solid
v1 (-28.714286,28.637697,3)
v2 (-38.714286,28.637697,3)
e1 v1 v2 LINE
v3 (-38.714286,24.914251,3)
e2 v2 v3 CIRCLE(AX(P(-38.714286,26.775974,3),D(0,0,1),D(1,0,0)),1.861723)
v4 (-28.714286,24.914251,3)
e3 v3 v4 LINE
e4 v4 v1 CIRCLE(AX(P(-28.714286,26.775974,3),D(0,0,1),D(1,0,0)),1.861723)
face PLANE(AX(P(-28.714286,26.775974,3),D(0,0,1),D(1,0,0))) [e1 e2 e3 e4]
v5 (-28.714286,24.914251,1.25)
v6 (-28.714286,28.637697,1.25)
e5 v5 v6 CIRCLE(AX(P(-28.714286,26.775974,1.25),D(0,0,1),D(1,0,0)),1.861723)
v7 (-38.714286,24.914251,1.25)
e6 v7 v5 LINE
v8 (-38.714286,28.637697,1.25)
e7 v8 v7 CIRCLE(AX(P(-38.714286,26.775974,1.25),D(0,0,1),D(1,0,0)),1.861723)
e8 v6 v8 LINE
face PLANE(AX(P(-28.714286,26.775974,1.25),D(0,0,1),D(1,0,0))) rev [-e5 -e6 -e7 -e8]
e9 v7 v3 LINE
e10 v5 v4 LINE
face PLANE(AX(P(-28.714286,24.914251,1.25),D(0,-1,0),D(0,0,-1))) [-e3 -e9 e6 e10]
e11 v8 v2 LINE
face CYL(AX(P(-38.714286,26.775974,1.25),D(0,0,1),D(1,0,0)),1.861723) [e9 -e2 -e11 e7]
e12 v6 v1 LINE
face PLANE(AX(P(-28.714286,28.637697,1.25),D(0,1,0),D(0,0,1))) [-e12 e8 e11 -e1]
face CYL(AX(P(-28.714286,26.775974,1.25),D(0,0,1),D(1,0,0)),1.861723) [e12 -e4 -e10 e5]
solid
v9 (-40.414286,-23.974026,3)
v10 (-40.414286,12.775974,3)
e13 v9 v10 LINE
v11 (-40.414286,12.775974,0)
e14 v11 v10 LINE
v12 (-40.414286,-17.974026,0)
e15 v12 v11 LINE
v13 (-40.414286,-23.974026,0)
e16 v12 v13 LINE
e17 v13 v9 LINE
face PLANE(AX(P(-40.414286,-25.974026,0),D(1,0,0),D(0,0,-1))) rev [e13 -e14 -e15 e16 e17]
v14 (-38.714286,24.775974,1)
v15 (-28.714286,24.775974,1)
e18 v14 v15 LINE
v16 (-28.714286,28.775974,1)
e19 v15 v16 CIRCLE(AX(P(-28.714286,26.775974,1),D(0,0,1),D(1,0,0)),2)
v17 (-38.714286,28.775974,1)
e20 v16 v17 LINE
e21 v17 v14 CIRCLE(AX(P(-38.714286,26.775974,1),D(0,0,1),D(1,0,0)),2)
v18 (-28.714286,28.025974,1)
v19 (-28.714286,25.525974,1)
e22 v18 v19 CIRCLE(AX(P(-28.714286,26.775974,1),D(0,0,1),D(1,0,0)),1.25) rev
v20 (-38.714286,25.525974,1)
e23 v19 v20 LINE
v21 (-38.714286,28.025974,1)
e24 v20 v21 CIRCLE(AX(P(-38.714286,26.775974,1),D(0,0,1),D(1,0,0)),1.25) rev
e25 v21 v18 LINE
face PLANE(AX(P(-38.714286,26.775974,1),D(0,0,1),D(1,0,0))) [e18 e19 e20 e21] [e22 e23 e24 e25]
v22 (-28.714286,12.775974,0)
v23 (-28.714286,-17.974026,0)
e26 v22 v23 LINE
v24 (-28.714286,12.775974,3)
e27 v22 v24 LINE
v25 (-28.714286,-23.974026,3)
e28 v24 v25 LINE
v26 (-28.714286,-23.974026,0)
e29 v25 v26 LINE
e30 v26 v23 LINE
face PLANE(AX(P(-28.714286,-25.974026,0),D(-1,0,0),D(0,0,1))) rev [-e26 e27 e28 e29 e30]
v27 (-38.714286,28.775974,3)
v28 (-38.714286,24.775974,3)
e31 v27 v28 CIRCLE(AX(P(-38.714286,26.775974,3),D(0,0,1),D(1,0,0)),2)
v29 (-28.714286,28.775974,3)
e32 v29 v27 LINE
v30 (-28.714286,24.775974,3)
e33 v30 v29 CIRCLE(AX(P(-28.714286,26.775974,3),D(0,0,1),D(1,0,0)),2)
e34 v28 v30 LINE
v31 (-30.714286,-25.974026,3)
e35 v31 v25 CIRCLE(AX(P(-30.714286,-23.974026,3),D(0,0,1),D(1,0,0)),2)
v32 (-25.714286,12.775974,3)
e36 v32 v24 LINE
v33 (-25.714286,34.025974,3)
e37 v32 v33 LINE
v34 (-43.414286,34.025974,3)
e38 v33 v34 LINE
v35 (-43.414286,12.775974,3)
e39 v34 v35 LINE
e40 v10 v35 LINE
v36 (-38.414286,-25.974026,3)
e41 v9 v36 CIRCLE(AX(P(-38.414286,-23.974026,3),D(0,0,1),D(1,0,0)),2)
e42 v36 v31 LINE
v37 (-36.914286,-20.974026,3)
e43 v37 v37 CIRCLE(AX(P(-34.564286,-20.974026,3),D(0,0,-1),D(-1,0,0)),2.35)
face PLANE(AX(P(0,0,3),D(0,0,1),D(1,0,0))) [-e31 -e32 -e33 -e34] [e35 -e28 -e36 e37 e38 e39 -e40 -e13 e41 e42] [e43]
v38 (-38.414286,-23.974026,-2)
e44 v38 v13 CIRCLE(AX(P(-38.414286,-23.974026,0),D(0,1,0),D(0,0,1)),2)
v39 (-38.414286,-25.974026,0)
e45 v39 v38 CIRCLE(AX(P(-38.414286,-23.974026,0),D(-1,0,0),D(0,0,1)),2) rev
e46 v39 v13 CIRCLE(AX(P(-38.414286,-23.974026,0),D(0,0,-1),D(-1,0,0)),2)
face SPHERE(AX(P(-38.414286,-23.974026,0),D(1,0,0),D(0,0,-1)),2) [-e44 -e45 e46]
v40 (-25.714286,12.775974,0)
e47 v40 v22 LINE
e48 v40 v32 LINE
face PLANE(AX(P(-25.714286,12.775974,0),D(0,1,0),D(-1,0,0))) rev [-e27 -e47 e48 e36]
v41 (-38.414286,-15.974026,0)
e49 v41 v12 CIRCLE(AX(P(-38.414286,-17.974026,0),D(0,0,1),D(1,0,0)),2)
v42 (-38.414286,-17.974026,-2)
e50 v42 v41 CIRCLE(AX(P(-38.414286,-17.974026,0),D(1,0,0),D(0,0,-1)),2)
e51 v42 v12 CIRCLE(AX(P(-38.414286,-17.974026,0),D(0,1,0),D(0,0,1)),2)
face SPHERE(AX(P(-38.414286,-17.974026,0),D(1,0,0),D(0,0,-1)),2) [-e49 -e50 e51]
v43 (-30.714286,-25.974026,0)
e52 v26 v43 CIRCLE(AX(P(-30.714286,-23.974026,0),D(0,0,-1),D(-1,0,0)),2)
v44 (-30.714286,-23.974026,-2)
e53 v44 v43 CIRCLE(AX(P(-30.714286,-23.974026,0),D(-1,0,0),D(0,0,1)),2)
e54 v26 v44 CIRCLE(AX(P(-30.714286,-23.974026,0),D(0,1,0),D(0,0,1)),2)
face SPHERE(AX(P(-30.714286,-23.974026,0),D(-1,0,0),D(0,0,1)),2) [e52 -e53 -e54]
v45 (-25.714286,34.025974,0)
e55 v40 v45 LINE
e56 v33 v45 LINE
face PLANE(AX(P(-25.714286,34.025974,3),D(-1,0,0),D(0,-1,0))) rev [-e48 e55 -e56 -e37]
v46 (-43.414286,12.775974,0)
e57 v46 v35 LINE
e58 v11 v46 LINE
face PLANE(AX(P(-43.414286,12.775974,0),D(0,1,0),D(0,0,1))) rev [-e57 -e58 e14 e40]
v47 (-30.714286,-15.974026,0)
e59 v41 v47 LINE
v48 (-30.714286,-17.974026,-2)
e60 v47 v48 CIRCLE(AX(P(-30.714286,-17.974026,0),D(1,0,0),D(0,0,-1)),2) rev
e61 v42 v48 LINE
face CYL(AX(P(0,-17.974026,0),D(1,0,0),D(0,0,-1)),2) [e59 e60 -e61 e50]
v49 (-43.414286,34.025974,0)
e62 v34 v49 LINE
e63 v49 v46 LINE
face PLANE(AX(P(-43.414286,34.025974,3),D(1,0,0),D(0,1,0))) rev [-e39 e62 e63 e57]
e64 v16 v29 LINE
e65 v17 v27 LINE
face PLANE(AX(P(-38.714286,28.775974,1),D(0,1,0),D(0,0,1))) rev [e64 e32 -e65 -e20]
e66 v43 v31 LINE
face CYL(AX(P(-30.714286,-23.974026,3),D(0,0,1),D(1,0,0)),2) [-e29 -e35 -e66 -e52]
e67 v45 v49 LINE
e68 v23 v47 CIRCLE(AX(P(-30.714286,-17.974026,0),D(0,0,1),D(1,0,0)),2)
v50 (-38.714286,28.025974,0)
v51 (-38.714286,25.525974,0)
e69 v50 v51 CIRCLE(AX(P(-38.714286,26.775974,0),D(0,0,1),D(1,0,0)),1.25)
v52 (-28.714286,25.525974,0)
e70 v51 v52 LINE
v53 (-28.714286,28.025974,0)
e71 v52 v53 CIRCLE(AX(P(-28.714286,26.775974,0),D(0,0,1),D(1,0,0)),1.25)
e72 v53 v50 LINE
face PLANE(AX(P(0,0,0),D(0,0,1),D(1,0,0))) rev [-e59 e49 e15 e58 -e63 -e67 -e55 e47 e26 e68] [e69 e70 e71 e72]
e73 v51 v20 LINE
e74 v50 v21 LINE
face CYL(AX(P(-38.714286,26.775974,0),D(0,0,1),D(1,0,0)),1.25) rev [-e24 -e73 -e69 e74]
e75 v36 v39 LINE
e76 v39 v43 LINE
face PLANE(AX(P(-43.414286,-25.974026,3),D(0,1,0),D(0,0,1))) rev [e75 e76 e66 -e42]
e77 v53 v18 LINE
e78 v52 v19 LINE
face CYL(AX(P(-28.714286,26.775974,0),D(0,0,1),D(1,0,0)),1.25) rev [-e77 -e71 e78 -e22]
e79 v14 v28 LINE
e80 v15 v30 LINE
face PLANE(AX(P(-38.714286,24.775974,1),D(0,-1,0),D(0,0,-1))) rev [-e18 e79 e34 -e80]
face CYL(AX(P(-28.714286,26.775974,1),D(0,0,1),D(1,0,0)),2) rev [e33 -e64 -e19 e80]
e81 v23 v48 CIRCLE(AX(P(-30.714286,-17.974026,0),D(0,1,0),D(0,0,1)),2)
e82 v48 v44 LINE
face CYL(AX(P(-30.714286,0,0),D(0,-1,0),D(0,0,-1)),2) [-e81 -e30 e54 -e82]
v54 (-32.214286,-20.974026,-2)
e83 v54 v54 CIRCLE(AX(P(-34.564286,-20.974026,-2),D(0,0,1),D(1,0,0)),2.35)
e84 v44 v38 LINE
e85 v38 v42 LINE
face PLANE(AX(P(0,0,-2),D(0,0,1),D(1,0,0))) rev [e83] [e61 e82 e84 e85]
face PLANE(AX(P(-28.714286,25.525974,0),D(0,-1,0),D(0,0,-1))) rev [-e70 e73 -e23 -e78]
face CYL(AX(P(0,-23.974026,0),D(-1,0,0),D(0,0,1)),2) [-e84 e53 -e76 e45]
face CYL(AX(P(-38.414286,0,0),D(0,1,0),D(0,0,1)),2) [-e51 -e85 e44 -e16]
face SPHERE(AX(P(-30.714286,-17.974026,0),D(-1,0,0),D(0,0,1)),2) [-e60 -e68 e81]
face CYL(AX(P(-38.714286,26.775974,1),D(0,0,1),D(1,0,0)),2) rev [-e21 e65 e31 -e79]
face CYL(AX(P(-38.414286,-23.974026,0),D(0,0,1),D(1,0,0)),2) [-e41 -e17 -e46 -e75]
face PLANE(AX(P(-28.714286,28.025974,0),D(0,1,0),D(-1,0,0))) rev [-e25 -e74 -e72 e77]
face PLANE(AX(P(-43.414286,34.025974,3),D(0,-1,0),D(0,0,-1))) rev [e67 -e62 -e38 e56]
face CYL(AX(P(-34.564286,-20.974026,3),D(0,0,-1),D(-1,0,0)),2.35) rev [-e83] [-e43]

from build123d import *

# Parameters (mm, degrees)
SKETCH1_W               = 17.7
SKETCH1_H               = 60
BOSS_EXTRUDE1_DEPTH     = 3
SKETCH2_W               = 3
SKETCH2_H               = 38.75
CUT_EXTRUDE1_DEPTH      = 56.240991234
CUT_EXTRUDE2_DEPTH      = 56.240991234
CUT_EXTRUDE3_DEPTH      = 2
SKETCH5_W               = 11.7
SKETCH5_H               = 10
BOSS_EXTRUDE2_DEPTH     = 2
CUT_EXTRUDE4_DEPTH      = 56.385621893
CUT_EXTRUDE4_DEPTH_BACK = 56.385621893
SKETCH6_R               = 2.35
FILLET1_R               = 2
FILLET2_R               = 2
FILLET3_R               = 2
FILLET4_R               = 2
BOSS_EXTRUDE3_DEPTH     = 1.75


with BuildPart() as part:
    # Sketch1 → Boss-Extrude1 (new body)
    with BuildSketch(Plane.XY):
        with Locations((-34.564285714, 4.025974026)):
            Rectangle(SKETCH1_W, SKETCH1_H)
    extrude(amount=BOSS_EXTRUDE1_DEPTH)

    # Sketch2 → Cut-Extrude1 (cut, through all)
    with BuildSketch(Plane.XY.offset(3)):
        with Locations((-41.914285714, -6.599025974)):
            Rectangle(SKETCH2_W, SKETCH2_H)
        with Locations((-27.214285714, -6.599025974)):
            Rectangle(SKETCH2_W, SKETCH2_H)
    extrude(amount=-CUT_EXTRUDE1_DEPTH, mode=Mode.SUBTRACT)

    # Sketch3 → Cut-Extrude2 (cut, through all)
    with BuildSketch(Plane.XY.offset(3)):
        with BuildLine():
            Line((-28.714285714, 25.525974026), (-38.714285714, 25.525974026))
            ThreePointArc((-38.714285714, 25.525974026), (-39.964285714, 26.775974026), (-38.714285714, 28.025974026))
            Line((-38.714285714, 28.025974026), (-28.714285714, 28.025974026))
            ThreePointArc((-28.714285714, 28.025974026), (-27.464285714, 26.775974026), (-28.714285714, 25.525974026))
        make_face()
    extrude(amount=-CUT_EXTRUDE2_DEPTH, mode=Mode.SUBTRACT)

    # Sketch4 → Cut-Extrude3 (cut)
    with BuildSketch(Plane.XY.offset(3)):
        with BuildLine():
            Line((-38.714285714, 28.775974026), (-28.714285714, 28.775974026))
            ThreePointArc((-28.714285714, 28.775974026), (-26.714285714, 26.775974026), (-28.714285714, 24.775974026))
            Line((-28.714285714, 24.775974026), (-38.714285714, 24.775974026))
            ThreePointArc((-38.714285714, 24.775974026), (-40.714285714, 26.775974026), (-38.714285714, 28.775974026))
        make_face()
    extrude(amount=-CUT_EXTRUDE3_DEPTH, mode=Mode.SUBTRACT)

    # Sketch5 → Boss-Extrude2 (add)
    with BuildSketch(Plane(origin=(0, 0, 0), x_dir=(-1, 0, 0), z_dir=(0, 0, -1))):
        with Locations((34.564285714, -20.974025974)):
            Rectangle(SKETCH5_W, SKETCH5_H)
    extrude(amount=BOSS_EXTRUDE2_DEPTH)

    # Sketch6 → Cut-Extrude4 (cut, two sides: drawn at the far end of the back side and taken through both)
    with BuildSketch(Plane(origin=(0, 0, -2), x_dir=(-1, 0, 0), z_dir=(0, 0, -1)).offset(-CUT_EXTRUDE4_DEPTH_BACK)):
        with Locations((34.564285714, -20.974025974)):
            Circle(SKETCH6_R)
    extrude(amount=CUT_EXTRUDE4_DEPTH + CUT_EXTRUDE4_DEPTH_BACK, mode=Mode.SUBTRACT)

    # Fillet1
    fillet1_edges = [part.edges().sort_by_distance(p)[0] for p in [
        (-34.564285714, -25.974025974, -2),
    ]]
    fillet(fillet1_edges, radius=FILLET1_R)

    # Fillet2
    fillet2_edges = [part.edges().sort_by_distance(p)[0] for p in [
        (-34.564285714, -15.974025974, -2),
    ]]
    fillet(fillet2_edges, radius=FILLET2_R - 0.0001)  # a hair under: the kernel refuses the full size

    # Fillet3
    fillet3_edges = [part.edges().sort_by_distance(p)[0] for p in [
        (-28.714285714, -25.974025974, 1.5),
        (-28.714285714, -25.388239536, -1.414213562),
        (-28.714285714, -20.973975974, -2),
        (-28.714285714, -16.559783122, -1.414242852),
    ]]
    fillet(fillet3_edges, radius=FILLET3_R - 0.0001)  # a hair under: the kernel refuses the full size

    # Fillet4
    fillet4_edges = [part.edges().sort_by_distance(p)[0] for p in [
        (-40.414285714, -20.973975974, -2),
        (-40.414285714, -25.974025974, 1.5),
        (-40.414285714, -25.388239536, -1.414213562),
        (-40.414285714, -16.559783122, -1.414242852),
    ]]
    fillet(fillet4_edges, radius=FILLET4_R - 0.0001)  # a hair under: the kernel refuses the full size


with BuildPart() as body_2:
    # Sketch7 → Boss-Extrude3 (new body)
    with BuildSketch(Plane.XY.offset(3)):
        with BuildLine():
            Line((-28.714285714, 24.914251461), (-38.714285714, 24.914251461))
            ThreePointArc((-38.714285714, 24.914251461), (-40.576008279, 26.775974026), (-38.714285714, 28.637696591))
            Line((-38.714285714, 28.637696591), (-28.714285714, 28.637696591))
            ThreePointArc((-28.714285714, 28.637696591), (-26.85256315, 26.775974026), (-28.714285714, 24.914251461))
        make_face()
    extrude(amount=-BOSS_EXTRUDE3_DEPTH)


solid = Compound([part.part, body_2.part])
